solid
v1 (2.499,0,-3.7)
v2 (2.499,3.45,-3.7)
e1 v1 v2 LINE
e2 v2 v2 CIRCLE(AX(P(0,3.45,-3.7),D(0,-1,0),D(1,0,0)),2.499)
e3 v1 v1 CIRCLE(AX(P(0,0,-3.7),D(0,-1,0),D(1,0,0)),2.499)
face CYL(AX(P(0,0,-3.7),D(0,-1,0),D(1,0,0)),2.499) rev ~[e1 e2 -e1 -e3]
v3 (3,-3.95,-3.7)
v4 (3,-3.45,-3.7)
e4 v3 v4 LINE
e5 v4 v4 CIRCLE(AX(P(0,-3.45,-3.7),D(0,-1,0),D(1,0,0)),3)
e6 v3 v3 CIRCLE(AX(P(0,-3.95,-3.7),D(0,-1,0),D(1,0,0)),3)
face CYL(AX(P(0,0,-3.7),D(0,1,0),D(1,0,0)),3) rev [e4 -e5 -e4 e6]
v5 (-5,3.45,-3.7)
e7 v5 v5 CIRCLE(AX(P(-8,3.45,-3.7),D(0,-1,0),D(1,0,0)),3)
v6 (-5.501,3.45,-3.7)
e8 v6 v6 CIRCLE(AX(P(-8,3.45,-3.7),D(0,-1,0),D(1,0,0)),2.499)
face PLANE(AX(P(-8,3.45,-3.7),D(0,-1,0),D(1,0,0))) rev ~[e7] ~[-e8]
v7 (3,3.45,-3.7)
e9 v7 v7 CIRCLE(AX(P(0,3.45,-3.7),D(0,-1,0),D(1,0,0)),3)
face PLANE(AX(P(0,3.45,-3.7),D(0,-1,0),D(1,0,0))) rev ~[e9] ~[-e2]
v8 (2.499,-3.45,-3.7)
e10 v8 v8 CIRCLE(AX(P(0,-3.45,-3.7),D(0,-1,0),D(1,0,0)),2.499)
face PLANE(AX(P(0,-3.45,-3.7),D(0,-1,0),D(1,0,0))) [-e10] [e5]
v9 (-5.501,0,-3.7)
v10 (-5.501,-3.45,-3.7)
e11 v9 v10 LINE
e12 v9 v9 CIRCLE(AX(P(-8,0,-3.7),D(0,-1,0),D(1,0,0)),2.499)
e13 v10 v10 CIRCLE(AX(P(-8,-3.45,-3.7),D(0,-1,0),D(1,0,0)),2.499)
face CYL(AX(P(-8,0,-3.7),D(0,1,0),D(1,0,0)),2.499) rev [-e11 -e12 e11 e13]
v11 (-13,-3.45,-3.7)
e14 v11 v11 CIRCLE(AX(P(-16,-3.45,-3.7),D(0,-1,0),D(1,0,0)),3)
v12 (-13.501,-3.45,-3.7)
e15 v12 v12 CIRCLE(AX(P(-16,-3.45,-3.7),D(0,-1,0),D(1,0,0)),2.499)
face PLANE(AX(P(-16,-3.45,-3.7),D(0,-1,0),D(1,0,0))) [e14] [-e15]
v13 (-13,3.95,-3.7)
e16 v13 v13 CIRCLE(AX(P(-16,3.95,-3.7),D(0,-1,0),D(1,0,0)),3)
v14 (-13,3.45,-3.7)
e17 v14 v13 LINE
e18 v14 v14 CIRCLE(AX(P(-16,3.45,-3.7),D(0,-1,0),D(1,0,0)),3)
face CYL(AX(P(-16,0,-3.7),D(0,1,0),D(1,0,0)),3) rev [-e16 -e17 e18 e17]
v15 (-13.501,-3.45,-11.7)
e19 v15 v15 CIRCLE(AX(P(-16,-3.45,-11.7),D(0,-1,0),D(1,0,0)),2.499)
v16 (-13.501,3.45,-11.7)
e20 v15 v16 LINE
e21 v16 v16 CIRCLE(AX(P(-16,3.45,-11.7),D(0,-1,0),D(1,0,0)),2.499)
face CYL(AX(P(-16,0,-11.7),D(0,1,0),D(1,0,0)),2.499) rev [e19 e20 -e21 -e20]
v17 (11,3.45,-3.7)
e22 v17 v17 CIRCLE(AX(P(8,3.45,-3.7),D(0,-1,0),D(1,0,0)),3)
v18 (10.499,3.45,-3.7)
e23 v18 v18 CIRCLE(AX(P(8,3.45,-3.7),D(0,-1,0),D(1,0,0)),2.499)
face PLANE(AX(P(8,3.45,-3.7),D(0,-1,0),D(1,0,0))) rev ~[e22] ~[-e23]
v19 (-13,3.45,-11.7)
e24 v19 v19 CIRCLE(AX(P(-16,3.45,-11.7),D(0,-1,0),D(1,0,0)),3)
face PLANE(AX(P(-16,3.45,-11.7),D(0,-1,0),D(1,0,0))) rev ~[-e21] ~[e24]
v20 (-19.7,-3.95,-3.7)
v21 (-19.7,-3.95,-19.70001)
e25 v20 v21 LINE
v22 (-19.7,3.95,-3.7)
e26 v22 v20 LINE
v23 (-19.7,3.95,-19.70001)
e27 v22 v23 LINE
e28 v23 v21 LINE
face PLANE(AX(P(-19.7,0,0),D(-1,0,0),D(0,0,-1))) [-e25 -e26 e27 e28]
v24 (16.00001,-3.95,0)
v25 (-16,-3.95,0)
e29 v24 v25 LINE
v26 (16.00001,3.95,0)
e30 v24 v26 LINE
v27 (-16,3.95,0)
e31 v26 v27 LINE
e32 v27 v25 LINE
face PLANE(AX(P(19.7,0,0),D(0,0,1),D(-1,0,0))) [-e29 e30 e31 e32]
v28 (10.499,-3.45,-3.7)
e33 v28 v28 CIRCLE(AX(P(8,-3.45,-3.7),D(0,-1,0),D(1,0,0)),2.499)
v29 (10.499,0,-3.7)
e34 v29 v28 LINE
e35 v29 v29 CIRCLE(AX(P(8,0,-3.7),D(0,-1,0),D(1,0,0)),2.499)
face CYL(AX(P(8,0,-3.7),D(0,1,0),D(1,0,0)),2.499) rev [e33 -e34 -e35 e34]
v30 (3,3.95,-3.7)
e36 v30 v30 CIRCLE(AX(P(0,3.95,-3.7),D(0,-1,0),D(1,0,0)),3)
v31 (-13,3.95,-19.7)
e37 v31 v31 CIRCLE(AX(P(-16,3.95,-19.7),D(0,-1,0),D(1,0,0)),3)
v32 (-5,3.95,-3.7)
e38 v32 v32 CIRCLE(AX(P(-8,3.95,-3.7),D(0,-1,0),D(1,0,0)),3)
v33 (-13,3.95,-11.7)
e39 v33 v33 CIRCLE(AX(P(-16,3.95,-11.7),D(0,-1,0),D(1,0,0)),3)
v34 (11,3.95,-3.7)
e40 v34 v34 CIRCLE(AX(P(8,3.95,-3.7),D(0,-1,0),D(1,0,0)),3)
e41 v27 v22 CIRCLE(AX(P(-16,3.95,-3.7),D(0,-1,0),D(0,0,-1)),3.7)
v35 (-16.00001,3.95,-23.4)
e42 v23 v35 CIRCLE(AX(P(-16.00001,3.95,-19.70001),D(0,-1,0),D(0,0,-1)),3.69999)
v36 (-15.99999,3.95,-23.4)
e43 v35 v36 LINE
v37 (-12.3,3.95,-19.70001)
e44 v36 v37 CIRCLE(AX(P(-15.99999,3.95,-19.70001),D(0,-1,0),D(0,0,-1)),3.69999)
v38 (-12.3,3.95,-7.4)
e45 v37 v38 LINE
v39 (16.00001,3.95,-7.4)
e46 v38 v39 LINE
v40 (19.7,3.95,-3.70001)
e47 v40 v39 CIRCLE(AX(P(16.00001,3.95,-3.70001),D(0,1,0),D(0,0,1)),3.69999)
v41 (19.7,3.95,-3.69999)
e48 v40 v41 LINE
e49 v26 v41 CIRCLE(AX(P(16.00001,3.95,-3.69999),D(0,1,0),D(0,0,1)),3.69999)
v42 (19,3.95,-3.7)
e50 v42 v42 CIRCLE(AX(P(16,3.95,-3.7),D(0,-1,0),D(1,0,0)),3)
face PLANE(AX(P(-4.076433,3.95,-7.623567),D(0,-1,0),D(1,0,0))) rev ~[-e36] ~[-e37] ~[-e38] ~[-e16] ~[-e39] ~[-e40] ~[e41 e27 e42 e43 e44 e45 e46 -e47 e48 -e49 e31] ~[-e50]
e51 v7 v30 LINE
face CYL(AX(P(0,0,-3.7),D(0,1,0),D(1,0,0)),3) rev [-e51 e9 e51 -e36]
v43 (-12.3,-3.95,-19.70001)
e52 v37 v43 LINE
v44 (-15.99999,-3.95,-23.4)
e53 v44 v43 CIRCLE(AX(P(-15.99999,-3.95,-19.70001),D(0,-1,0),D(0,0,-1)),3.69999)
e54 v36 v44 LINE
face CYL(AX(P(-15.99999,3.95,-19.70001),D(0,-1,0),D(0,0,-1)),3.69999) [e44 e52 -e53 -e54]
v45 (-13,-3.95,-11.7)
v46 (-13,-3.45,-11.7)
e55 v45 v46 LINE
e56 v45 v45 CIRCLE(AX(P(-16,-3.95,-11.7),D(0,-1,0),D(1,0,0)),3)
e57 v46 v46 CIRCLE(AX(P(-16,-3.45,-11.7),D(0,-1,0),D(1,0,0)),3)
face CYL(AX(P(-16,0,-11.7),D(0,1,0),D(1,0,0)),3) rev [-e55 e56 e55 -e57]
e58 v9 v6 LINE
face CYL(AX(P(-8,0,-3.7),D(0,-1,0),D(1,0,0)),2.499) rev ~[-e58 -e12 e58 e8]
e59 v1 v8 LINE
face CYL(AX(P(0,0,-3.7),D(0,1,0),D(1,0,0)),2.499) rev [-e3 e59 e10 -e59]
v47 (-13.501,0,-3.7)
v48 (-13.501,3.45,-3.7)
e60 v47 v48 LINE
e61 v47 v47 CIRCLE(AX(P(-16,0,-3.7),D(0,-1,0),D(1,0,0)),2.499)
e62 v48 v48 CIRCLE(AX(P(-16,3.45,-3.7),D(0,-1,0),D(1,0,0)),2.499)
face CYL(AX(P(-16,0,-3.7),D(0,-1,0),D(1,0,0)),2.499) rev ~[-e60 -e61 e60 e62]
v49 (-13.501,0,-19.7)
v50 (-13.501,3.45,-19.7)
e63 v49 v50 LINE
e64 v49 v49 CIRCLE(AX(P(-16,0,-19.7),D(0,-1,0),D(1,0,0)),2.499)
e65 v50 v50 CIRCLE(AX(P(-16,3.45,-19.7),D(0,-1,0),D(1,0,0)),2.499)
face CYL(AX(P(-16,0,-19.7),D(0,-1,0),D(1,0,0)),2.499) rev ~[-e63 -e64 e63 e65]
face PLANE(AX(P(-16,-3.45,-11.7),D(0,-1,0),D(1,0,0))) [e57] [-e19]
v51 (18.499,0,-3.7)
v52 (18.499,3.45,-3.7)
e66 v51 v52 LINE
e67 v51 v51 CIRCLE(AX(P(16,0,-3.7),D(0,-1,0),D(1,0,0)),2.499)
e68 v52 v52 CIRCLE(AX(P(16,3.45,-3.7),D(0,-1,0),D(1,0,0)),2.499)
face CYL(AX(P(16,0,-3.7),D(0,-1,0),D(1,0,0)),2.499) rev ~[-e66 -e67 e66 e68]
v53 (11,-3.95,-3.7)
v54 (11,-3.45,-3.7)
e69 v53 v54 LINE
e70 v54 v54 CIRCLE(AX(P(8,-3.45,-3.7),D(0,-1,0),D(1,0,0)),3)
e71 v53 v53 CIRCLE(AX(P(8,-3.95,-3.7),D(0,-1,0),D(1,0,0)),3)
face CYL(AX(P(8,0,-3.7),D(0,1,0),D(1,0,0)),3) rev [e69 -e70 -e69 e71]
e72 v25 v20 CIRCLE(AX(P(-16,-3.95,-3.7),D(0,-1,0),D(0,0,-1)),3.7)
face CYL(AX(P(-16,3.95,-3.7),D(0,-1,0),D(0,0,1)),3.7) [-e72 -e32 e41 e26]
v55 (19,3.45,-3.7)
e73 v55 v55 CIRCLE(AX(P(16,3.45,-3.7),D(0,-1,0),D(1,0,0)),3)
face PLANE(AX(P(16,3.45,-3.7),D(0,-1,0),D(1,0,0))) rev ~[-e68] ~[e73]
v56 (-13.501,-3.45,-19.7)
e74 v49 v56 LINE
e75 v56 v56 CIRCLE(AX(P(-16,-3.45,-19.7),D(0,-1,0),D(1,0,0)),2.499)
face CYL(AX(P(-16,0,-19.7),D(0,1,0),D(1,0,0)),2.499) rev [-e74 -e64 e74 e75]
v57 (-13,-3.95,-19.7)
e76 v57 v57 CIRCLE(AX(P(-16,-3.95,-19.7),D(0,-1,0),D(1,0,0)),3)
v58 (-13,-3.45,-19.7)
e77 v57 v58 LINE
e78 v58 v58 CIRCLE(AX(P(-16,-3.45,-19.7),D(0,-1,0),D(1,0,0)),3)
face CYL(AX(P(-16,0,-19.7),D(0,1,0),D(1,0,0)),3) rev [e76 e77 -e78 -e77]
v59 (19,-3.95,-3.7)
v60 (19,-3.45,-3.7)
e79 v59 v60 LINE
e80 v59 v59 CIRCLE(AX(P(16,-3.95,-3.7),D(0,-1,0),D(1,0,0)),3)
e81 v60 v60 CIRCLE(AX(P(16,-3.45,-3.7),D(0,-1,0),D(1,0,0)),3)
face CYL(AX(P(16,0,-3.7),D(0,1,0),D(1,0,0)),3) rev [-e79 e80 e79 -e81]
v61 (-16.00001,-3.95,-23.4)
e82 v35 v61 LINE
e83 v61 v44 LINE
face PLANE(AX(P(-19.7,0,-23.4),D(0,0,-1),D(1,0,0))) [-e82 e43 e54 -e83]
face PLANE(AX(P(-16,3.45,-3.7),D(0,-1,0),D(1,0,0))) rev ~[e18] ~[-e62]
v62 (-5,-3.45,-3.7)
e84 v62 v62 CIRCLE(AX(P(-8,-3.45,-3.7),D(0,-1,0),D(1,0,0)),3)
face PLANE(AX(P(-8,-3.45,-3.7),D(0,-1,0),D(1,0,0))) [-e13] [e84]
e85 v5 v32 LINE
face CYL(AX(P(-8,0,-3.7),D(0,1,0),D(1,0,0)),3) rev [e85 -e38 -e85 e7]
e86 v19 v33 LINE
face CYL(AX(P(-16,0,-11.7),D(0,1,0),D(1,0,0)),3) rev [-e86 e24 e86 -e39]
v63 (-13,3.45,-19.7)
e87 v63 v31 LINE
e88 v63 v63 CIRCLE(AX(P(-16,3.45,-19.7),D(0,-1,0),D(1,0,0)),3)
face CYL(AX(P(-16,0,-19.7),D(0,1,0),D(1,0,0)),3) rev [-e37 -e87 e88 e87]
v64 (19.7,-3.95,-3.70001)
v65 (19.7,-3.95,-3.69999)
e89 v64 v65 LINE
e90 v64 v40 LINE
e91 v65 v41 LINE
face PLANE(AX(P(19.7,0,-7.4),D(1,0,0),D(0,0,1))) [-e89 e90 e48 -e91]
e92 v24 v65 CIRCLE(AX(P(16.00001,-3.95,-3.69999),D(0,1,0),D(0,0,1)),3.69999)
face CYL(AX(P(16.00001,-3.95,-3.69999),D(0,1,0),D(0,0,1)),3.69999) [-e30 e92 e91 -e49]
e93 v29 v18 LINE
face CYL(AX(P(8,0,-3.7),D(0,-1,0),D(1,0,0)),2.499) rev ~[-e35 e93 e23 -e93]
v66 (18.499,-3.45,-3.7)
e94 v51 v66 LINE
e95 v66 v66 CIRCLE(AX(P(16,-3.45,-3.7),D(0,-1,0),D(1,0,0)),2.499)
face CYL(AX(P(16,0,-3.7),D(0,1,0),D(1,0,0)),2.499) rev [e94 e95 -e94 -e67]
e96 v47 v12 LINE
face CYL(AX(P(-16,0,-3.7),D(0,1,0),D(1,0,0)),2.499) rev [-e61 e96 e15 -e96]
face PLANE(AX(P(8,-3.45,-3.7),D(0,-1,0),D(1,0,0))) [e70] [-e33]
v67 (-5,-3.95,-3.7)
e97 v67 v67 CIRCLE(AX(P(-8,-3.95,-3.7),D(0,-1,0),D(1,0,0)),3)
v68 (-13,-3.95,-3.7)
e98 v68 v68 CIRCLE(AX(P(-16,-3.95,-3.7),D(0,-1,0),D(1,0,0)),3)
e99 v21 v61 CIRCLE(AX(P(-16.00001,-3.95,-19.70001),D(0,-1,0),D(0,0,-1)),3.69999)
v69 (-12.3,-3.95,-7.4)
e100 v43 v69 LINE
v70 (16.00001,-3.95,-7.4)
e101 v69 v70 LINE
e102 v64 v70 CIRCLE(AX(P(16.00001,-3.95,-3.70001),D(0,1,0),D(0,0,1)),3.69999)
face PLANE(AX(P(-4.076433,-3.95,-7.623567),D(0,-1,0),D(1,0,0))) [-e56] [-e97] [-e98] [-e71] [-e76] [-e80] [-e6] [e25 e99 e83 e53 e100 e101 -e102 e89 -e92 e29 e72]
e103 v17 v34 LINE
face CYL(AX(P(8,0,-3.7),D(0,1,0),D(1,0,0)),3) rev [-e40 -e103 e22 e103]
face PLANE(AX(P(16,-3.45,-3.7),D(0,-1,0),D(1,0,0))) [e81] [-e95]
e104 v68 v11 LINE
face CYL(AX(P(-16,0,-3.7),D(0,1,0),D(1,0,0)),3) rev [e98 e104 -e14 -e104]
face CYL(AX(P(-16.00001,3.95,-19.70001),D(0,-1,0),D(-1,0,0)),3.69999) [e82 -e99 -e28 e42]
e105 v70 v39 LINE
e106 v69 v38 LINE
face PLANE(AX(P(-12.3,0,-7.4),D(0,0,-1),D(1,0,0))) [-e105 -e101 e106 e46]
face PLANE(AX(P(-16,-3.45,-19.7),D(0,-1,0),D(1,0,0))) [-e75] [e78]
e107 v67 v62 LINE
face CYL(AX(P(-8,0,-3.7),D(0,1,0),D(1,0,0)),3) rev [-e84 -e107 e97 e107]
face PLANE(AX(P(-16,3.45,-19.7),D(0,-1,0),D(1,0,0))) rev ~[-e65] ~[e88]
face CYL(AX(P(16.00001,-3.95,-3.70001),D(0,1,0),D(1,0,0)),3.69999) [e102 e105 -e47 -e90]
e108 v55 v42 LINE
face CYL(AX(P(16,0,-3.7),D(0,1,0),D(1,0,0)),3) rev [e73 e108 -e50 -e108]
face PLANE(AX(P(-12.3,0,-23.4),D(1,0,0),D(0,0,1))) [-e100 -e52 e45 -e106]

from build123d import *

# Parameters (mm, degrees)
F0_R     = 3
F1_DEPTH = 3.95
F0_R_2   = 2.499
F2_DEPTH = 3.45
F3_R     = 3.69999
F4_R     = 3.7


# Not quite as in the source:
# - a fillet or chamfer is up to 0.001 mm smaller than in the source, because OpenCascade refuses the exact size


with BuildPart() as f1:
    # F0 (on Front) → F1 (new body, symmetric)
    with BuildSketch(Plane.XZ):
        Polygon((19.7, 0), (-19.7, 0), (-19.7, -23.4), (-12.3, -23.4), (-12.3, -7.4), (19.7, -7.4), align=None)
        with Locations((-16, -19.7)):
            Circle(F0_R, mode=Mode.SUBTRACT)
        with Locations((-16, -11.7)):
            Circle(F0_R, mode=Mode.SUBTRACT)
        with Locations((-16, -3.7)):
            Circle(F0_R, mode=Mode.SUBTRACT)
        with Locations((-8, -3.7)):
            Circle(F0_R, mode=Mode.SUBTRACT)
        with Locations((0, -3.7)):
            Circle(F0_R, mode=Mode.SUBTRACT)
        with Locations((8, -3.7)):
            Circle(F0_R, mode=Mode.SUBTRACT)
        with Locations((16, -3.7)):
            Circle(F0_R, mode=Mode.SUBTRACT)
    extrude(amount=F1_DEPTH, both=True)

    # F0 (on Front) → F2 (join, symmetric)
    with BuildSketch(Plane.XZ):
        with Locations((16, -3.7)):
            Circle(F0_R)
        with Locations((16, -3.7)):
            Circle(F0_R_2, mode=Mode.SUBTRACT)
        with Locations((8, -3.7)):
            Circle(F0_R)
        with Locations((8, -3.7)):
            Circle(F0_R_2, mode=Mode.SUBTRACT)
        with Locations((0, -3.7)):
            Circle(F0_R)
        with Locations((0, -3.7)):
            Circle(F0_R_2, mode=Mode.SUBTRACT)
        with Locations((-8, -3.7)):
            Circle(F0_R)
        with Locations((-8, -3.7)):
            Circle(F0_R_2, mode=Mode.SUBTRACT)
        with Locations((-16, -3.7)):
            Circle(F0_R)
        with Locations((-16, -3.7)):
            Circle(F0_R_2, mode=Mode.SUBTRACT)
        with Locations((-16, -19.7)):
            Circle(F0_R)
        with Locations((-16, -19.7)):
            Circle(F0_R_2, mode=Mode.SUBTRACT)
        with Locations((-16, -11.7)):
            Circle(F0_R)
        with Locations((-16, -11.7)):
            Circle(F0_R_2, mode=Mode.SUBTRACT)
    extrude(amount=F2_DEPTH, both=True)

    # F3 (radius 3.7 in the source; OpenCascade refuses exactly that, so slightly less here)
    f3_edges = [f1.edges().sort_by_distance(p)[0] for p in [
        (19.7, 0, 0),
        (19.7, 0, -7.4),
        (-12.3, 0, -23.4),
        (-19.7, 0, -23.4),
    ]]
    fillet(f3_edges, radius=F3_R)

    # F4
    f4_edges = [f1.edges().sort_by_distance(p)[0] for p in [
        (-19.7, 0, 0),
    ]]
    fillet(f4_edges, radius=F4_R)


solid = f1.part
